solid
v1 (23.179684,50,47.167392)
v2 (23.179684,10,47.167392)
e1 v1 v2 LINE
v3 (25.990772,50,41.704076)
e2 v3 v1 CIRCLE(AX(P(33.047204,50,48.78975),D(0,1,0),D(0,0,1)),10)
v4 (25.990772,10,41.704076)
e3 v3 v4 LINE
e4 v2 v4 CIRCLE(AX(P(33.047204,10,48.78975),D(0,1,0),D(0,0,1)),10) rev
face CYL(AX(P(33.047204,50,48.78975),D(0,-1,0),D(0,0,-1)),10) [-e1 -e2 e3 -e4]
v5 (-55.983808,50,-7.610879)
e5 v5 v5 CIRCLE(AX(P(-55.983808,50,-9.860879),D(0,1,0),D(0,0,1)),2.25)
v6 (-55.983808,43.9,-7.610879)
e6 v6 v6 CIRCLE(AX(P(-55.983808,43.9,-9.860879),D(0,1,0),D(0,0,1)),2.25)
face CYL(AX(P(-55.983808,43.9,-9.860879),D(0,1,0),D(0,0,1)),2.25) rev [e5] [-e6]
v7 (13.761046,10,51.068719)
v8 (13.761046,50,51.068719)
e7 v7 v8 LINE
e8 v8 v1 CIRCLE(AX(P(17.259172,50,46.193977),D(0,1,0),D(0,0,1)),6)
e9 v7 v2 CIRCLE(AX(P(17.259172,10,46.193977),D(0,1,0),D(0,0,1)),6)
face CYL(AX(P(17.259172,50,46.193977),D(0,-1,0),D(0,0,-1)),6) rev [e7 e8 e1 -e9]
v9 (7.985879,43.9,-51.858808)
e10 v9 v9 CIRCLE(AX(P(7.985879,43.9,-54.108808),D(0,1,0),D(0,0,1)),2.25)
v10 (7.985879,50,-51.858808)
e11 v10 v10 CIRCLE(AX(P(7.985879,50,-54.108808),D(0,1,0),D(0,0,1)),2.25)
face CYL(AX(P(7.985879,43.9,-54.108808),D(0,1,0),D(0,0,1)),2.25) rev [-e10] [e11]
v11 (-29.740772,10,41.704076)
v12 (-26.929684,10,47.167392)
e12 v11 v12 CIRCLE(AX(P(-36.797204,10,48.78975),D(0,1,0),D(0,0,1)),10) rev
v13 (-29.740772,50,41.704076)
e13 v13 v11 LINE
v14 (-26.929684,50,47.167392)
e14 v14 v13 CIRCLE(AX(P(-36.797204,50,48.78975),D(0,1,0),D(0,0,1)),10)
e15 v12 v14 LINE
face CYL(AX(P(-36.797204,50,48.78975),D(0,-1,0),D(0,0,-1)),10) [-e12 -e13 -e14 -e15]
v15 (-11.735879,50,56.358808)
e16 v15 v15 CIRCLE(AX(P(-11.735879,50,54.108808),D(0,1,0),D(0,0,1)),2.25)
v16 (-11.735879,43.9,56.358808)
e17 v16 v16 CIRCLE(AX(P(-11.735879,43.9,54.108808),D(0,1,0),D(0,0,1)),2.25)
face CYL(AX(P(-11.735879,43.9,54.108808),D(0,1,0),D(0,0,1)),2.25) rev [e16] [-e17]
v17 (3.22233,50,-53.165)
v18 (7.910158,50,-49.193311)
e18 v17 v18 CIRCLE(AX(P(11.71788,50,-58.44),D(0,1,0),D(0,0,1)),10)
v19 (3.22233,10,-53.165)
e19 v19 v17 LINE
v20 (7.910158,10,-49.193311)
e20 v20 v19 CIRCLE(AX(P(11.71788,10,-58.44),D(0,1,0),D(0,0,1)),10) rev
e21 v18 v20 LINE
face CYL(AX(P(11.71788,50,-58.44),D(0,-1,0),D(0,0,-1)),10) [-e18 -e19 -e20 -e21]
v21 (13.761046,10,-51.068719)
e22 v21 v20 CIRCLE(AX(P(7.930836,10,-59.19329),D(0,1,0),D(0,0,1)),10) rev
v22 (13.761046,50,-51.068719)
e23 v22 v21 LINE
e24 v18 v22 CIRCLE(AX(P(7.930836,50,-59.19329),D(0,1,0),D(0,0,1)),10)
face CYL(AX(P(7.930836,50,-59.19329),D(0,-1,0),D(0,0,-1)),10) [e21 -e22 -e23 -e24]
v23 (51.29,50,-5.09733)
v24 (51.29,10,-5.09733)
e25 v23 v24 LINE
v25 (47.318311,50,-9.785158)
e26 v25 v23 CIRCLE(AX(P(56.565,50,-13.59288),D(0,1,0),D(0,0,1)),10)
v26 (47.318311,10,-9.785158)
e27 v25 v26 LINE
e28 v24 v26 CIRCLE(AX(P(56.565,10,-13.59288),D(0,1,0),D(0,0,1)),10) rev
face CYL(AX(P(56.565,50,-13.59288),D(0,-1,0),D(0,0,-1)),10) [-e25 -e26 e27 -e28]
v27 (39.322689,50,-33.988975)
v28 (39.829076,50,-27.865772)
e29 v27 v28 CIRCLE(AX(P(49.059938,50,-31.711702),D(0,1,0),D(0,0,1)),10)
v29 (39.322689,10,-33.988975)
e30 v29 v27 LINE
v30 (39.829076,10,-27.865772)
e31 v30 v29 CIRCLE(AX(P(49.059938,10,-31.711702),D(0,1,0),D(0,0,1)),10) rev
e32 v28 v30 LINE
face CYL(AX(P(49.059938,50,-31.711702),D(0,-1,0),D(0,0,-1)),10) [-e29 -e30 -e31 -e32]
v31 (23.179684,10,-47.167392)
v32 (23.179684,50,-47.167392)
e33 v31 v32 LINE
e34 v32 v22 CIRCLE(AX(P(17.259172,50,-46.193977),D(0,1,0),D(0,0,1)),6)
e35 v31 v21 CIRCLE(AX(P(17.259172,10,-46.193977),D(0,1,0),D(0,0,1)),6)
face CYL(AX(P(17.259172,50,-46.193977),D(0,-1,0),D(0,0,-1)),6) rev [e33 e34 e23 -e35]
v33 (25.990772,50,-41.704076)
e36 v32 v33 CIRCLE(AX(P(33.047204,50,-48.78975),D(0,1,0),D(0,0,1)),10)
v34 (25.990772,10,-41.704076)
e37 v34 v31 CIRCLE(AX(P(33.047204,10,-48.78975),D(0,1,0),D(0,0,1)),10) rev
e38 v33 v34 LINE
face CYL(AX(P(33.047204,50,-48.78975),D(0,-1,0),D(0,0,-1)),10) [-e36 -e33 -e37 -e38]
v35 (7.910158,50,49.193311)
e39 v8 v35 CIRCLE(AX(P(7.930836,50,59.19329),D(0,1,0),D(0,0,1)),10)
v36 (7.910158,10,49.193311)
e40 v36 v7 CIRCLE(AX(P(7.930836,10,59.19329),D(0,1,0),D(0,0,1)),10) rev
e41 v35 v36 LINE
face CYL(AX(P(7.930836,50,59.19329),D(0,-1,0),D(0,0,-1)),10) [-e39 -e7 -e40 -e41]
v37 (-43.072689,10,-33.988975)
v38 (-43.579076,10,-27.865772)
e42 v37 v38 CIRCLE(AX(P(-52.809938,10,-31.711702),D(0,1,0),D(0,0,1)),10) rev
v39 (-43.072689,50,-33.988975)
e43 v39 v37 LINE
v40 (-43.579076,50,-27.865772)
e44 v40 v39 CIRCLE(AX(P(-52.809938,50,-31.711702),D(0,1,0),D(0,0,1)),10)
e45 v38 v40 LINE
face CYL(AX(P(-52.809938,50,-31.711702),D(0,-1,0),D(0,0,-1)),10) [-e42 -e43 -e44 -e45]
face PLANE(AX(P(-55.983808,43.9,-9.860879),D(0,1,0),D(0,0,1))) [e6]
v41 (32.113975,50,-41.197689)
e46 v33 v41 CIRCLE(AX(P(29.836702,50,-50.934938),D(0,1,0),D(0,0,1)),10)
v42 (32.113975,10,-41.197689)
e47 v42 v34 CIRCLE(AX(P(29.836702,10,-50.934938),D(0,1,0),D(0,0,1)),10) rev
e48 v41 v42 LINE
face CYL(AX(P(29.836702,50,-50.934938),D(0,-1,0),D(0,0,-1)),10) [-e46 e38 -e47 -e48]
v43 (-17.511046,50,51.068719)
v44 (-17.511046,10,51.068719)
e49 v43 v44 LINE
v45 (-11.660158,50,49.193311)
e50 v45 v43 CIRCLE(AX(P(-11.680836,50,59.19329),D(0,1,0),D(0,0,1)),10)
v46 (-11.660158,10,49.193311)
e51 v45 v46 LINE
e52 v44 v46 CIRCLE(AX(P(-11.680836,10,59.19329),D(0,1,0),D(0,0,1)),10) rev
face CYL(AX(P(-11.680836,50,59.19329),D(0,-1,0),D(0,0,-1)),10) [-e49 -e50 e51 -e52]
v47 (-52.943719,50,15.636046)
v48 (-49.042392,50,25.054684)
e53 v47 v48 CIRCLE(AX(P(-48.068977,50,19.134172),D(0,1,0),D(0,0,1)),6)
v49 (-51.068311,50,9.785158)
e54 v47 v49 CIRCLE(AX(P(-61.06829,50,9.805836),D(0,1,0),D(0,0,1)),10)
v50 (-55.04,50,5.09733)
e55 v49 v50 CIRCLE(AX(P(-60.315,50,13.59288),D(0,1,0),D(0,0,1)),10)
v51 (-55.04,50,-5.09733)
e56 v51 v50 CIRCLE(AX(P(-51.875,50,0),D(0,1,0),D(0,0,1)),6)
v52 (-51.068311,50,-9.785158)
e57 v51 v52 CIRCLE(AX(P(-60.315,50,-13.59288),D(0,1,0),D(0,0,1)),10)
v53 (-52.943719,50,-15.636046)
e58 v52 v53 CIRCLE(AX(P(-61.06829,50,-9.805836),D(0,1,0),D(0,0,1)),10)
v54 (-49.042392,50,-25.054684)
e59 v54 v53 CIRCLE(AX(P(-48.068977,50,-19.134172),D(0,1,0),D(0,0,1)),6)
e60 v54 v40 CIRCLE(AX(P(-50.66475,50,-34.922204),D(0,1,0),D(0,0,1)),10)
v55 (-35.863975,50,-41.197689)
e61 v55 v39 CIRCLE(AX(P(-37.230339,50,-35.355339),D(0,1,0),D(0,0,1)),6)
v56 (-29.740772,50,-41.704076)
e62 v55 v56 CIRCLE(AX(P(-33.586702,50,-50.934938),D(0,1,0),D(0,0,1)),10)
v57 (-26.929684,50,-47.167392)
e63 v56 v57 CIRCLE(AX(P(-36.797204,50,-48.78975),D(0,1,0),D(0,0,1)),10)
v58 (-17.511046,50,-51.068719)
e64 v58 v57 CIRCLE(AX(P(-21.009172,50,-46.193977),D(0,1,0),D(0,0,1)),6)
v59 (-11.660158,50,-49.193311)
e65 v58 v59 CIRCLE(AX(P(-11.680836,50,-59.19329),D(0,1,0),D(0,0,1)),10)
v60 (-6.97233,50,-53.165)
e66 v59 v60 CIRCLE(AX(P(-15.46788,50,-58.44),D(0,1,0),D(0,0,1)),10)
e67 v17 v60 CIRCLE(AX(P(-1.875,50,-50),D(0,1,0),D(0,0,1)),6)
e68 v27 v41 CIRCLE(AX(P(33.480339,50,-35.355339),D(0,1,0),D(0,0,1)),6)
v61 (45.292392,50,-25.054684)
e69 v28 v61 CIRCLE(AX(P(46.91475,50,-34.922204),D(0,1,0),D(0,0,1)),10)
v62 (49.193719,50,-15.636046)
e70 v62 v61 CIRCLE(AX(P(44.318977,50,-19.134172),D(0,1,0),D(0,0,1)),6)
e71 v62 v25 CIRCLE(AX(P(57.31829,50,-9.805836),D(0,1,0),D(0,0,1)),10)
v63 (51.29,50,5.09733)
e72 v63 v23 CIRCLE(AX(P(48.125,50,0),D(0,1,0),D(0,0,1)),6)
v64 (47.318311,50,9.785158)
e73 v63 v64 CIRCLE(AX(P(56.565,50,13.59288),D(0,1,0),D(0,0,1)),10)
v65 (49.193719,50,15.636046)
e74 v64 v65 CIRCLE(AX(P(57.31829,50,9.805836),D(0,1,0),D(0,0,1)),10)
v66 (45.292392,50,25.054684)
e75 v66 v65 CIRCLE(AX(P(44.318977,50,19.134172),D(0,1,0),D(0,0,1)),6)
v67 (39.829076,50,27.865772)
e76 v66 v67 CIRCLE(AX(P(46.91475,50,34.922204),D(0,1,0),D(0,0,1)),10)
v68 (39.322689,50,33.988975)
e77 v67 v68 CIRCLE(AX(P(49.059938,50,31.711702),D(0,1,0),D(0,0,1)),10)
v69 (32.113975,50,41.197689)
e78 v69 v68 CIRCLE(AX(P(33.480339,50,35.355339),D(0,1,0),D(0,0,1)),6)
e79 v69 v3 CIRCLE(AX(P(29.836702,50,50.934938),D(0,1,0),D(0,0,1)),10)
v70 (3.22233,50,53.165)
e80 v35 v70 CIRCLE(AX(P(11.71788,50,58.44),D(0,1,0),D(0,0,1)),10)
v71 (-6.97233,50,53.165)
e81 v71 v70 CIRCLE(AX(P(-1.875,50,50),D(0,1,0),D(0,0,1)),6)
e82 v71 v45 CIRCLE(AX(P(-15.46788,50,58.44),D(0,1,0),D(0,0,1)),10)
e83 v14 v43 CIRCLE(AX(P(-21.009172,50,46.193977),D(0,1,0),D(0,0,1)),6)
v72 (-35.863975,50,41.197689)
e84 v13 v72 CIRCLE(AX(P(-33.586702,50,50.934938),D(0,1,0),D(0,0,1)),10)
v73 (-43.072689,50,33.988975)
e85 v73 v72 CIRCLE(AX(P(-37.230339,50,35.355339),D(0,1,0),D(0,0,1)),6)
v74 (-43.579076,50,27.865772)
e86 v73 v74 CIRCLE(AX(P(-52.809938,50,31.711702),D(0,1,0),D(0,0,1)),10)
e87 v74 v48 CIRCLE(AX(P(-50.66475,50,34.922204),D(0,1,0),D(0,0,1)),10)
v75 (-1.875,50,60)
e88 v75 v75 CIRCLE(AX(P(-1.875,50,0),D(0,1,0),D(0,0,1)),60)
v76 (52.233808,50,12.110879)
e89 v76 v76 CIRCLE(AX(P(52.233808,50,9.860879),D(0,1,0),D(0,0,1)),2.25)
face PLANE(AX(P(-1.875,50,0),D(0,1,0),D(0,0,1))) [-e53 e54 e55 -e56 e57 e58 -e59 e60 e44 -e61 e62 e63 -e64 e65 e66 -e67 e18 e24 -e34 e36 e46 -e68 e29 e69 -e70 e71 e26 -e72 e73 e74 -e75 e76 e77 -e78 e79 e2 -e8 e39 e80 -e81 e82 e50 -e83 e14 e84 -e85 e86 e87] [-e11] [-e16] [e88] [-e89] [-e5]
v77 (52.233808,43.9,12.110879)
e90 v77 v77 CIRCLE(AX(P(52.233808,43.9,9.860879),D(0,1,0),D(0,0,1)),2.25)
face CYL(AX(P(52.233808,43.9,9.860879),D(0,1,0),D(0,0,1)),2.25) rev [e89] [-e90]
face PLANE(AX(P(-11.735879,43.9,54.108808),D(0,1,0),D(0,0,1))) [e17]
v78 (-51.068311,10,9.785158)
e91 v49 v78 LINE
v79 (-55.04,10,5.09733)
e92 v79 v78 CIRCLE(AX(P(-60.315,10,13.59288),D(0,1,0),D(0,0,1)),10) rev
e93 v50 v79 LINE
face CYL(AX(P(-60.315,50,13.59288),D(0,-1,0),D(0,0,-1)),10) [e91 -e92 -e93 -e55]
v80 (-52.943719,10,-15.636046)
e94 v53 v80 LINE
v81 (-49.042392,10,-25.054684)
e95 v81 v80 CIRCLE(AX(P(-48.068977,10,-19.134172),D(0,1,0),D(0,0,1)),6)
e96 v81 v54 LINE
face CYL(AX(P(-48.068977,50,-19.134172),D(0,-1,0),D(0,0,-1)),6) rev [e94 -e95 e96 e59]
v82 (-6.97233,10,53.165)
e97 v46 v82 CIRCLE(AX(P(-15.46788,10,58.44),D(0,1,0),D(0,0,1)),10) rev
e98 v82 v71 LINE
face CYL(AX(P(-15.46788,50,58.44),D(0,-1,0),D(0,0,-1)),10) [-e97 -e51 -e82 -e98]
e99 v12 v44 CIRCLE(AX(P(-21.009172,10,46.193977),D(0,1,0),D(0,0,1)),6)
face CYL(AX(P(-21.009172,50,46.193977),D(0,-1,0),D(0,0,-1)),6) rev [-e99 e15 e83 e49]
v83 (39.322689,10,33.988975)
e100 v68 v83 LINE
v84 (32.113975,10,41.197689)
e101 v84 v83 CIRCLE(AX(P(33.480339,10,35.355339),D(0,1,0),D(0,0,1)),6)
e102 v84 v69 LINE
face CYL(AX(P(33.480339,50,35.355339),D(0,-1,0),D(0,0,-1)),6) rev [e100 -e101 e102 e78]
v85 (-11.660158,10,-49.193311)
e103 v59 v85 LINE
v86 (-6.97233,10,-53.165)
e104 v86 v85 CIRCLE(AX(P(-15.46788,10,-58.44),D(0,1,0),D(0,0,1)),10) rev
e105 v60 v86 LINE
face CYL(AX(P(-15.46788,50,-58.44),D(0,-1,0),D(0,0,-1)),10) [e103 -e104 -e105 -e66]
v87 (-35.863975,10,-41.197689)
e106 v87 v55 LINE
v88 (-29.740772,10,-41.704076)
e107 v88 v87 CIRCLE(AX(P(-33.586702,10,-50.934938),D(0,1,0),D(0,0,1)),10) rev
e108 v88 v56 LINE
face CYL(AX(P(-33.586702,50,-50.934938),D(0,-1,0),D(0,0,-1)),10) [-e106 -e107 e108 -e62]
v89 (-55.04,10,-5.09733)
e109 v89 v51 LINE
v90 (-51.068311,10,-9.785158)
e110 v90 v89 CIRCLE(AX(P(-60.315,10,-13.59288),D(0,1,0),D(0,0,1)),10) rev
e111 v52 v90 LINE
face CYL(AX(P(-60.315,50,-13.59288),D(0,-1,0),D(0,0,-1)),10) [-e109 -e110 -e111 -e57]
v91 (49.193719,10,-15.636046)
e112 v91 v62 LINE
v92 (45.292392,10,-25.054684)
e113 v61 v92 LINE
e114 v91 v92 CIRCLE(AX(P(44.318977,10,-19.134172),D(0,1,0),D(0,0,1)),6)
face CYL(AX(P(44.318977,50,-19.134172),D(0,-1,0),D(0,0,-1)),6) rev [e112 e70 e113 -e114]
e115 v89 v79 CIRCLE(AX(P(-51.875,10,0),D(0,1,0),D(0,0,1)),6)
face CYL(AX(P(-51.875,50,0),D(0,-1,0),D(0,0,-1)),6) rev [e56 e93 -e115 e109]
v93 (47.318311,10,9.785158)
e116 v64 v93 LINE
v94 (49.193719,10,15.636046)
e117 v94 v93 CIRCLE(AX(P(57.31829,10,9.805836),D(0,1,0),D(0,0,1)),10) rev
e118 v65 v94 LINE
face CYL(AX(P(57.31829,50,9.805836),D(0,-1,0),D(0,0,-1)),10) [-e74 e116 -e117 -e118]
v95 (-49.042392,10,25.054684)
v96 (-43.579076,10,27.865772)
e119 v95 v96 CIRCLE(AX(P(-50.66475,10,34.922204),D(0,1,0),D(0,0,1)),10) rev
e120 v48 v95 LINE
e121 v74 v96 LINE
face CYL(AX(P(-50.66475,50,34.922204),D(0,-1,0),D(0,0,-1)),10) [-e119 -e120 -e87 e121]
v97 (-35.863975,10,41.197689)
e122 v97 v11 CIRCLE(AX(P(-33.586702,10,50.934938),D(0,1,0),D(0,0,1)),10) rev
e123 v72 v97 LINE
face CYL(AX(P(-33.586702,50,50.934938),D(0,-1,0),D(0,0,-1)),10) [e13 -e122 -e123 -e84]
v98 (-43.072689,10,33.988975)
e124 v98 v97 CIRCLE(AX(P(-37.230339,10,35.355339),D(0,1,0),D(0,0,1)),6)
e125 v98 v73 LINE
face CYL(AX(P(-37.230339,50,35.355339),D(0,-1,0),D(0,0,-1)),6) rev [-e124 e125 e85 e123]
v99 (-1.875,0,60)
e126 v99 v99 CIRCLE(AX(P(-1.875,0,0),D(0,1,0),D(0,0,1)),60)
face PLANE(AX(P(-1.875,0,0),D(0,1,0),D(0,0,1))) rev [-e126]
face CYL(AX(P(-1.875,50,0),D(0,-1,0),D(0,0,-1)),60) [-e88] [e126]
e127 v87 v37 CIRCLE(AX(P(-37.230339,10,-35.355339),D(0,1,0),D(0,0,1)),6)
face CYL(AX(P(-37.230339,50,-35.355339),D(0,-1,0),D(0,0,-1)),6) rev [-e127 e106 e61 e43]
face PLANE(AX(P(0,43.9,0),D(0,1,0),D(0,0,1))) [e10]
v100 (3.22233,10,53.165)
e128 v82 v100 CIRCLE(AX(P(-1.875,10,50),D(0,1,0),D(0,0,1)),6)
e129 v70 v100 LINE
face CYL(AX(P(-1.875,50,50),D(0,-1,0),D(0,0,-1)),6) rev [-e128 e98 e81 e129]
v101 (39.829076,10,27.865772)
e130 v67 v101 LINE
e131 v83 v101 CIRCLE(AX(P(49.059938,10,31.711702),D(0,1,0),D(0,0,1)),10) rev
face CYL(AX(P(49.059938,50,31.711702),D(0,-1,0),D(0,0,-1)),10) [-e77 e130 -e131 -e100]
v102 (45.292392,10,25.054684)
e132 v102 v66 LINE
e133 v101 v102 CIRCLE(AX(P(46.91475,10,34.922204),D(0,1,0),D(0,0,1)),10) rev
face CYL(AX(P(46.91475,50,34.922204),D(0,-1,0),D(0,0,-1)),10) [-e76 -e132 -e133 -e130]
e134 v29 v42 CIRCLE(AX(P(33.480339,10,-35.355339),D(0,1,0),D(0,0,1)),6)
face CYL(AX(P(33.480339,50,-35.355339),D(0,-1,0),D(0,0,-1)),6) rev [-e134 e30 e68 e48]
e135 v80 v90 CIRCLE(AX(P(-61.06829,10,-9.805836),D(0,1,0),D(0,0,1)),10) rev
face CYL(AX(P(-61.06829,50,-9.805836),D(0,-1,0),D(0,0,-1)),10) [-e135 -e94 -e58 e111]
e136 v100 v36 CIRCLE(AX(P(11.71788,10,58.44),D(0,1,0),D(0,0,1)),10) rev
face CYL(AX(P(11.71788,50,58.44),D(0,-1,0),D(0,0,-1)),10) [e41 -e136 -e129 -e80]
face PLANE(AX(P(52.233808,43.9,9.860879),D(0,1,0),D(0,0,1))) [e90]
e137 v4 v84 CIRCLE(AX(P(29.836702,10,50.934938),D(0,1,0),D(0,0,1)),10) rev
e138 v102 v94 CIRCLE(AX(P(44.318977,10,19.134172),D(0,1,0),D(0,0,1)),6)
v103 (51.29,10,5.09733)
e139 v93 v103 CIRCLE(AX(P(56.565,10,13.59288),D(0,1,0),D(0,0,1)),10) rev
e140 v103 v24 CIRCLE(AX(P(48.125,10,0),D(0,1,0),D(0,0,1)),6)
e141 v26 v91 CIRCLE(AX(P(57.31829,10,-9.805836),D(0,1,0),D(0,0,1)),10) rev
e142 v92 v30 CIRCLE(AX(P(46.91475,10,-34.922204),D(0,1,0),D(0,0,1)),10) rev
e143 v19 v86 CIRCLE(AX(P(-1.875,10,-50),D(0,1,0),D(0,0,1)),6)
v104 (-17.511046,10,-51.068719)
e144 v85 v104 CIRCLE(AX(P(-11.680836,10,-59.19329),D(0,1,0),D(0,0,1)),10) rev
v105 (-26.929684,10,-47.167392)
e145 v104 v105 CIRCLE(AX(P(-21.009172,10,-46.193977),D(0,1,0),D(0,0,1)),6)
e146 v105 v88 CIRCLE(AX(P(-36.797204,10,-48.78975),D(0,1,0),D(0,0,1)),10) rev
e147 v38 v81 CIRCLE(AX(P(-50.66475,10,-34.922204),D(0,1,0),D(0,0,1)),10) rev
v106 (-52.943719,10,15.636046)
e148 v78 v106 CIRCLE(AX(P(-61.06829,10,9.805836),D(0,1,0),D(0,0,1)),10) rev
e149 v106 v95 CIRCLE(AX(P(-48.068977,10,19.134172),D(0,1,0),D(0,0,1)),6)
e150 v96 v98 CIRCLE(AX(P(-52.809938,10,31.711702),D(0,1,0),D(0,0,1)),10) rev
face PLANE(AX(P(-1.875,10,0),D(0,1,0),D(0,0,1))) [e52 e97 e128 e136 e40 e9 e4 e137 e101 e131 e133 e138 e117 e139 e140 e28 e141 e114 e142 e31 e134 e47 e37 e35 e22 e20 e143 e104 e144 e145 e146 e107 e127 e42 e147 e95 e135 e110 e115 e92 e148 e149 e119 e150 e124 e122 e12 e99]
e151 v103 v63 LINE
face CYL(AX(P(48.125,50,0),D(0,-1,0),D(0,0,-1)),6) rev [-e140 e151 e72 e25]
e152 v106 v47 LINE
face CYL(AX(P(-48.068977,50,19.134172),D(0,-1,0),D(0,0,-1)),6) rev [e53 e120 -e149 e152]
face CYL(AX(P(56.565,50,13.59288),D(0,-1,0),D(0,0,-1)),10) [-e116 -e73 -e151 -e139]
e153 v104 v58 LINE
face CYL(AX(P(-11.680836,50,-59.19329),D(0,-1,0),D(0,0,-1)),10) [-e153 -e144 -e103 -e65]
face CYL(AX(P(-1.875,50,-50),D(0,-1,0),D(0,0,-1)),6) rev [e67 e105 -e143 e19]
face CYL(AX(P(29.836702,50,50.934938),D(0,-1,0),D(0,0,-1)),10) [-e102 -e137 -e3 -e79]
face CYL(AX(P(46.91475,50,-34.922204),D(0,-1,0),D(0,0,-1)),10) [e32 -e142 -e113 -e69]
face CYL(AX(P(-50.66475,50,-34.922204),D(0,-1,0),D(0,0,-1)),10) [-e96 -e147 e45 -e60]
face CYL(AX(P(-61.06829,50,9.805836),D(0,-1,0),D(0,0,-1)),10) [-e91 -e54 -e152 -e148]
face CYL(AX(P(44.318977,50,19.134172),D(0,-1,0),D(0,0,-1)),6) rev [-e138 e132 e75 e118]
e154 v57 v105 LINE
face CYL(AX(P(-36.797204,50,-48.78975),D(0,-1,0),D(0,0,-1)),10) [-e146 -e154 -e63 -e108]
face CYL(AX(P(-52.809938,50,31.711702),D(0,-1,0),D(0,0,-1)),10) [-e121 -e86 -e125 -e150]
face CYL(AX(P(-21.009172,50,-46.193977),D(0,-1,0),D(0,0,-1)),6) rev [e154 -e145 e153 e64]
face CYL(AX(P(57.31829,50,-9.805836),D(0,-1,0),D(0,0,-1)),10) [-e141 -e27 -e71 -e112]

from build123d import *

# Parameters (mm, degrees)
SKETCH1_R           = 59.999999999
BOSS_EXTRUDE1_DEPTH = 50
SKETCH3_R           = 59.999999999
BOSS_EXTRUDE2_DEPTH = 10
FILLET1_R           = 10
FILLET2_R           = 10
SKETCH5_R           = 2.25
CUT_EXTRUDE2_DEPTH  = 6.1


with BuildPart() as part:
    # Sketch1 → Boss-Extrude1 (new body)
    with BuildSketch(Plane(origin=(0, 0, 0), x_dir=(1, 0, 0), z_dir=(0, 1, 0))):
        with Locations(Location((-1.875, 3e-09, 0), (0, 0, 270))):
            Circle(SKETCH1_R)
        with BuildLine():
            ThreePointArc((-50.028343877, 13.463115287), (-50.914264017, 9.754516103), (-51.514999998, 5.989190263))
            ThreePointArc((-51.514999998, 5.989190263), (-57.874999995, 3e-09), (-51.514999998, -5.989190257))
            ThreePointArc((-51.514999998, -5.989190257), (-50.914264017, -9.754516098), (-50.028343877, -13.463115281))
            ThreePointArc((-50.028343877, -13.463115281), (-53.612253816, -21.430272208), (-45.444416106, -24.529695876))
            ThreePointArc((-45.444416106, -24.529695876), (-43.448480613, -27.778511647), (-41.210777663, -30.865783567))
            ThreePointArc((-41.210777663, -30.865783567), (-41.472979743, -39.59797974), (-32.74078357, -39.33577766))
            ThreePointArc((-32.74078357, -39.33577766), (-29.653511649, -41.57348061), (-26.404695879, -43.569416103))
            ThreePointArc((-26.404695879, -43.569416103), (-23.30527221, -51.737253813), (-15.338115284, -48.153343875))
            ThreePointArc((-15.338115284, -48.153343875), (-11.6295161, -49.039264015), (-7.86419026, -49.639999995))
            ThreePointArc((-7.86419026, -49.639999995), (-1.875, -55.999999992), (4.11419026, -49.639999995))
            ThreePointArc((4.11419026, -49.639999995), (7.8795161, -49.039264015), (11.588115284, -48.153343875))
            ThreePointArc((11.588115284, -48.153343875), (19.55527221, -51.737253813), (22.654695879, -43.569416103))
            ThreePointArc((22.654695879, -43.569416103), (25.903511649, -41.57348061), (28.99078357, -39.33577766))
            ThreePointArc((28.99078357, -39.33577766), (37.722979743, -39.59797974), (37.460777663, -30.865783567))
            ThreePointArc((37.460777663, -30.865783567), (39.698480613, -27.778511647), (41.694416106, -24.529695876))
            ThreePointArc((41.694416106, -24.529695876), (49.862253816, -21.430272208), (46.278343877, -13.463115281))
            ThreePointArc((46.278343877, -13.463115281), (47.164264017, -9.754516098), (47.764999998, -5.989190257))
            ThreePointArc((47.764999998, -5.989190257), (54.124999995, 3e-09), (47.764999998, 5.989190263))
            ThreePointArc((47.764999998, 5.989190263), (47.164264017, 9.754516103), (46.278343877, 13.463115287))
            ThreePointArc((46.278343877, 13.463115287), (49.862253816, 21.430272213), (41.694416106, 24.529695882))
            ThreePointArc((41.694416106, 24.529695882), (39.698480613, 27.778511652), (37.460777663, 30.865783572))
            ThreePointArc((37.460777663, 30.865783572), (37.722979743, 39.597979745), (28.99078357, 39.335777666))
            ThreePointArc((28.99078357, 39.335777666), (25.903511649, 41.573480616), (22.654695879, 43.569416109))
            ThreePointArc((22.654695879, 43.569416109), (19.55527221, 51.737253819), (11.588115284, 48.15334388))
            ThreePointArc((11.588115284, 48.15334388), (7.8795161, 49.03926402), (4.11419026, 49.64))
            ThreePointArc((4.11419026, 49.64), (-1.875, 55.999999998), (-7.86419026, 49.64))
            ThreePointArc((-7.86419026, 49.64), (-11.6295161, 49.03926402), (-15.338115284, 48.15334388))
            ThreePointArc((-15.338115284, 48.15334388), (-23.30527221, 51.737253819), (-26.404695879, 43.569416109))
            ThreePointArc((-26.404695879, 43.569416109), (-29.653511649, 41.573480616), (-32.74078357, 39.335777666))
            ThreePointArc((-32.74078357, 39.335777666), (-41.472979743, 39.597979745), (-41.210777663, 30.865783572))
            ThreePointArc((-41.210777663, 30.865783572), (-43.448480613, 27.778511652), (-45.444416106, 24.529695882))
            ThreePointArc((-45.444416106, 24.529695882), (-53.612253816, 21.430272213), (-50.028343877, 13.463115287))
        make_face(mode=Mode.SUBTRACT)
    extrude(amount=BOSS_EXTRUDE1_DEPTH)

    # Sketch3 → Boss-Extrude2 (add)
    with BuildSketch(Plane(origin=(0, 0, 0), x_dir=(1, 0, 0), z_dir=(0, 1, 0))):
        with Locations(Location((-1.875, 3e-09, 0), (0, 0, 270))):
            Circle(SKETCH3_R)
    extrude(amount=BOSS_EXTRUDE2_DEPTH)

    # Fillet1
    # the kernel refuses this fillet: 10 mm, written as the material it takes off along each edge
    with BuildSketch(Plane(origin=(11.588115284, 10, -48.15334388), x_dir=(-0.9762460203923251, 0, -0.2166649664070039), z_dir=(0, 1, 0))) as fillet1_piece_1:
        with BuildLine():
            CenterArc((5.962374186, -9.98529915), FILLET1_R, 93.107148893, 45.06938167)
            ThreePointArc((-1.489654942, -3.316921396), (-0.487517252, -1.774020699), (0, 0))
            ThreePointArc((0, 0), (2.710170085, -0.073504248), (5.420340169, 0))
        make_face()
    extrude(amount=53.550850423, mode=Mode.SUBTRACT)
    with BuildSketch(Plane(origin=(4.11419026, 10, -49.64), x_dir=(0.9848478099539646, 0, 0.17342085004081753), z_dir=(0, 1, 0))) as fillet1_piece_2:
        with BuildLine():
            CenterArc((5.962374186, 9.98529915), FILLET1_R, 221.823469437, 45.06938167)
            ThreePointArc((-1.489654942, 3.316921396), (-0.487517252, 1.774020699), (0, 0))
            ThreePointArc((0, 0), (2.710170085, 0.073504248), (5.420340169, 0))
        make_face()
    extrude(amount=53.550850423, mode=Mode.SUBTRACT)

    # Fillet2
    # the kernel refuses this fillet: 10 mm, written as the material it takes off along each edge
    with BuildSketch(Plane(origin=(-50.028343877, 10, -13.463115287), x_dir=(-0.8017919038554878, 0, -0.5976033324135602), z_dir=(0, 1, 0)), Plane(origin=(-51.514999998, 10, 5.989190257), x_dir=(-0.9694520237461802, 0, -0.24528100956746685), z_dir=(0, 1, 0)), Plane(origin=(-45.444416106, 10, 24.529695876), x_dir=(-0.9895218611259949, 0, 0.14438312350737928), z_dir=(0, 1, 0)), Plane(origin=(-32.74078357, 10, 39.33577766), x_dir=(-0.8589459651873854, 0, 0.5120662348645055), z_dir=(0, 1, 0)), Plane(origin=(-15.338115284, 10, 48.153343875), x_dir=(-0.5976033324135606, 0, 0.8017919038554876), z_dir=(0, 1, 0)), Plane(origin=(-41.210777663, 10, -30.865783572), x_dir=(-0.512066234864506, 0, -0.8589459651873851), z_dir=(0, 1, 0)), Plane(origin=(-26.404695879, 10, -43.569416109), x_dir=(-0.14438312350738092, 0, -0.9895218611259947), z_dir=(0, 1, 0)), Plane(origin=(-7.86419026, 10, -49.64), x_dir=(0.2452810095674737, 0, -0.9694520237461783), z_dir=(0, 1, 0)), Plane(origin=(4.11419026, 10, 49.639999995), x_dir=(-0.24528100956747004, 0, 0.9694520237461793), z_dir=(0, 1, 0)), Plane(origin=(22.654695879, 10, 43.569416103), x_dir=(0.14438312350738092, 0, 0.9895218611259947), z_dir=(0, 1, 0)), Plane(origin=(37.460777663, 10, 30.865783567), x_dir=(0.5120662348645055, 0, 0.8589459651873854), z_dir=(0, 1, 0)), Plane(origin=(46.278343877, 10, 13.463115281), x_dir=(0.8017919038554872, 0, 0.5976033324135612), z_dir=(0, 1, 0)), Plane(origin=(47.764999998, 10, -5.989190263), x_dir=(0.9694520237461796, 0, 0.24528100956746887), z_dir=(0, 1, 0)), Plane(origin=(41.694416106, 10, -24.529695882), x_dir=(0.9895218611259945, 0, -0.14438312350738228), z_dir=(0, 1, 0)), Plane(origin=(28.99078357, 10, -39.335777666), x_dir=(0.8589459651873865, 0, -0.5120662348645036), z_dir=(0, 1, 0))) as fillet2_piece_1:
        with BuildLine():
            CenterArc((6.666136994, 9.529885762), FILLET2_R, 207.292364441, 45.06938167)
            ThreePointArc((-2.220646476, 4.944574479), (-1.043270762, 2.502401023), (0, 0))
            ThreePointArc((0, 0), (1.818037362, 0.282068543), (3.636074723, 0))
        make_face()
    extrude(amount=53.550850423, mode=Mode.SUBTRACT)
    with BuildSketch(Plane(origin=(-51.514999998, 10, -5.989190263), x_dir=(0.17342085004081384, 0, -0.9848478099539651), z_dir=(0, 1, 0)), Plane(origin=(-50.028343877, 10, 13.463115281), x_dir=(-0.21666496640700172, 0, -0.9762460203923256), z_dir=(0, 1, 0)), Plane(origin=(-41.210777663, 10, 30.865783567), x_dir=(-0.5737655057921729, 0, -0.8190196239181647), z_dir=(0, 1, 0)), Plane(origin=(-26.404695879, 10, 43.569416103), x_dir=(-0.8435154481177425, 0, -0.5371049141338442), z_dir=(0, 1, 0)), Plane(origin=(-7.86419026, 10, 49.639999995), x_dir=(-0.9848478099539649, 0, -0.17342085004081545), z_dir=(0, 1, 0)), Plane(origin=(-45.444416106, 10, -24.529695882), x_dir=(0.537104914133847, 0, -0.8435154481177406), z_dir=(0, 1, 0)), Plane(origin=(-32.74078357, 10, -39.335777666), x_dir=(0.8190196239181653, 0, -0.5737655057921723), z_dir=(0, 1, 0)), Plane(origin=(-15.338115284, 10, -48.15334388), x_dir=(0.9762460203923244, 0, -0.21666496640700658), z_dir=(0, 1, 0)), Plane(origin=(11.588115284, 10, 48.153343875), x_dir=(-0.9762460203923242, 0, 0.2166649664070072), z_dir=(0, 1, 0)), Plane(origin=(28.99078357, 10, 39.33577766), x_dir=(-0.8190196239181662, 0, 0.5737655057921711), z_dir=(0, 1, 0)), Plane(origin=(41.694416106, 10, 24.529695876), x_dir=(-0.5371049141338422, 0, 0.8435154481177437), z_dir=(0, 1, 0)), Plane(origin=(47.764999998, 10, 5.989190257), x_dir=(-0.17342085004081517, 0, 0.984847809953965), z_dir=(0, 1, 0)), Plane(origin=(46.278343877, 10, -13.463115287), x_dir=(0.21666496640700275, 0, 0.9762460203923252), z_dir=(0, 1, 0)), Plane(origin=(37.460777663, 10, -30.865783572), x_dir=(0.5737655057921707, 0, 0.8190196239181664), z_dir=(0, 1, 0))) as fillet2_piece_2:
        with BuildLine():
            CenterArc((5.962374186, 9.98529915), FILLET2_R, 221.823469437, 45.06938167)
            ThreePointArc((-1.489654942, 3.316921396), (-0.487517252, 1.774020699), (0, 0))
            ThreePointArc((0, 0), (2.710170085, 0.073504248), (5.420340169, 0))
        make_face()
    extrude(amount=53.550850423, mode=Mode.SUBTRACT)
    with BuildSketch(Plane(origin=(22.654695879, 10, -43.569416109), x_dir=(0.14438312350738122, 0, -0.9895218611259947), z_dir=(0, 1, 0))) as fillet2_piece_3:
        with BuildLine():
            CenterArc((6.666136994, -9.529885762), FILLET2_R, 107.638253889, 45.06938167)
            ThreePointArc((-2.220646476, -4.944574479), (-1.043270762, -2.502401023), (0, 0))
            ThreePointArc((0, 0), (1.818037362, -0.282068543), (3.636074723, 0))
        make_face()
    extrude(amount=53.550850423, mode=Mode.SUBTRACT)

    # Sketch5 → Cut-Extrude2 (cut)
    with BuildSketch(Plane(origin=(0, 50, 0), x_dir=(1, 0, 0), z_dir=(0, 1, 0))):
        with Locations(Location((7.985878763, 54.108807696, 0), (0, 0, 270))):
            Circle(SKETCH5_R)
        with Locations(Location((-55.983807694, 9.860878766, 0), (0, 0, 270))):
            Circle(SKETCH5_R)
        with Locations(Location((-11.735878763, -54.108807691, 0), (0, 0, 270))):
            Circle(SKETCH5_R)
        with Locations(Location((52.233807694, -9.86087876, 0), (0, 0, 270))):
            Circle(SKETCH5_R)
    extrude(amount=-CUT_EXTRUDE2_DEPTH, mode=Mode.SUBTRACT)


solid = part.part
